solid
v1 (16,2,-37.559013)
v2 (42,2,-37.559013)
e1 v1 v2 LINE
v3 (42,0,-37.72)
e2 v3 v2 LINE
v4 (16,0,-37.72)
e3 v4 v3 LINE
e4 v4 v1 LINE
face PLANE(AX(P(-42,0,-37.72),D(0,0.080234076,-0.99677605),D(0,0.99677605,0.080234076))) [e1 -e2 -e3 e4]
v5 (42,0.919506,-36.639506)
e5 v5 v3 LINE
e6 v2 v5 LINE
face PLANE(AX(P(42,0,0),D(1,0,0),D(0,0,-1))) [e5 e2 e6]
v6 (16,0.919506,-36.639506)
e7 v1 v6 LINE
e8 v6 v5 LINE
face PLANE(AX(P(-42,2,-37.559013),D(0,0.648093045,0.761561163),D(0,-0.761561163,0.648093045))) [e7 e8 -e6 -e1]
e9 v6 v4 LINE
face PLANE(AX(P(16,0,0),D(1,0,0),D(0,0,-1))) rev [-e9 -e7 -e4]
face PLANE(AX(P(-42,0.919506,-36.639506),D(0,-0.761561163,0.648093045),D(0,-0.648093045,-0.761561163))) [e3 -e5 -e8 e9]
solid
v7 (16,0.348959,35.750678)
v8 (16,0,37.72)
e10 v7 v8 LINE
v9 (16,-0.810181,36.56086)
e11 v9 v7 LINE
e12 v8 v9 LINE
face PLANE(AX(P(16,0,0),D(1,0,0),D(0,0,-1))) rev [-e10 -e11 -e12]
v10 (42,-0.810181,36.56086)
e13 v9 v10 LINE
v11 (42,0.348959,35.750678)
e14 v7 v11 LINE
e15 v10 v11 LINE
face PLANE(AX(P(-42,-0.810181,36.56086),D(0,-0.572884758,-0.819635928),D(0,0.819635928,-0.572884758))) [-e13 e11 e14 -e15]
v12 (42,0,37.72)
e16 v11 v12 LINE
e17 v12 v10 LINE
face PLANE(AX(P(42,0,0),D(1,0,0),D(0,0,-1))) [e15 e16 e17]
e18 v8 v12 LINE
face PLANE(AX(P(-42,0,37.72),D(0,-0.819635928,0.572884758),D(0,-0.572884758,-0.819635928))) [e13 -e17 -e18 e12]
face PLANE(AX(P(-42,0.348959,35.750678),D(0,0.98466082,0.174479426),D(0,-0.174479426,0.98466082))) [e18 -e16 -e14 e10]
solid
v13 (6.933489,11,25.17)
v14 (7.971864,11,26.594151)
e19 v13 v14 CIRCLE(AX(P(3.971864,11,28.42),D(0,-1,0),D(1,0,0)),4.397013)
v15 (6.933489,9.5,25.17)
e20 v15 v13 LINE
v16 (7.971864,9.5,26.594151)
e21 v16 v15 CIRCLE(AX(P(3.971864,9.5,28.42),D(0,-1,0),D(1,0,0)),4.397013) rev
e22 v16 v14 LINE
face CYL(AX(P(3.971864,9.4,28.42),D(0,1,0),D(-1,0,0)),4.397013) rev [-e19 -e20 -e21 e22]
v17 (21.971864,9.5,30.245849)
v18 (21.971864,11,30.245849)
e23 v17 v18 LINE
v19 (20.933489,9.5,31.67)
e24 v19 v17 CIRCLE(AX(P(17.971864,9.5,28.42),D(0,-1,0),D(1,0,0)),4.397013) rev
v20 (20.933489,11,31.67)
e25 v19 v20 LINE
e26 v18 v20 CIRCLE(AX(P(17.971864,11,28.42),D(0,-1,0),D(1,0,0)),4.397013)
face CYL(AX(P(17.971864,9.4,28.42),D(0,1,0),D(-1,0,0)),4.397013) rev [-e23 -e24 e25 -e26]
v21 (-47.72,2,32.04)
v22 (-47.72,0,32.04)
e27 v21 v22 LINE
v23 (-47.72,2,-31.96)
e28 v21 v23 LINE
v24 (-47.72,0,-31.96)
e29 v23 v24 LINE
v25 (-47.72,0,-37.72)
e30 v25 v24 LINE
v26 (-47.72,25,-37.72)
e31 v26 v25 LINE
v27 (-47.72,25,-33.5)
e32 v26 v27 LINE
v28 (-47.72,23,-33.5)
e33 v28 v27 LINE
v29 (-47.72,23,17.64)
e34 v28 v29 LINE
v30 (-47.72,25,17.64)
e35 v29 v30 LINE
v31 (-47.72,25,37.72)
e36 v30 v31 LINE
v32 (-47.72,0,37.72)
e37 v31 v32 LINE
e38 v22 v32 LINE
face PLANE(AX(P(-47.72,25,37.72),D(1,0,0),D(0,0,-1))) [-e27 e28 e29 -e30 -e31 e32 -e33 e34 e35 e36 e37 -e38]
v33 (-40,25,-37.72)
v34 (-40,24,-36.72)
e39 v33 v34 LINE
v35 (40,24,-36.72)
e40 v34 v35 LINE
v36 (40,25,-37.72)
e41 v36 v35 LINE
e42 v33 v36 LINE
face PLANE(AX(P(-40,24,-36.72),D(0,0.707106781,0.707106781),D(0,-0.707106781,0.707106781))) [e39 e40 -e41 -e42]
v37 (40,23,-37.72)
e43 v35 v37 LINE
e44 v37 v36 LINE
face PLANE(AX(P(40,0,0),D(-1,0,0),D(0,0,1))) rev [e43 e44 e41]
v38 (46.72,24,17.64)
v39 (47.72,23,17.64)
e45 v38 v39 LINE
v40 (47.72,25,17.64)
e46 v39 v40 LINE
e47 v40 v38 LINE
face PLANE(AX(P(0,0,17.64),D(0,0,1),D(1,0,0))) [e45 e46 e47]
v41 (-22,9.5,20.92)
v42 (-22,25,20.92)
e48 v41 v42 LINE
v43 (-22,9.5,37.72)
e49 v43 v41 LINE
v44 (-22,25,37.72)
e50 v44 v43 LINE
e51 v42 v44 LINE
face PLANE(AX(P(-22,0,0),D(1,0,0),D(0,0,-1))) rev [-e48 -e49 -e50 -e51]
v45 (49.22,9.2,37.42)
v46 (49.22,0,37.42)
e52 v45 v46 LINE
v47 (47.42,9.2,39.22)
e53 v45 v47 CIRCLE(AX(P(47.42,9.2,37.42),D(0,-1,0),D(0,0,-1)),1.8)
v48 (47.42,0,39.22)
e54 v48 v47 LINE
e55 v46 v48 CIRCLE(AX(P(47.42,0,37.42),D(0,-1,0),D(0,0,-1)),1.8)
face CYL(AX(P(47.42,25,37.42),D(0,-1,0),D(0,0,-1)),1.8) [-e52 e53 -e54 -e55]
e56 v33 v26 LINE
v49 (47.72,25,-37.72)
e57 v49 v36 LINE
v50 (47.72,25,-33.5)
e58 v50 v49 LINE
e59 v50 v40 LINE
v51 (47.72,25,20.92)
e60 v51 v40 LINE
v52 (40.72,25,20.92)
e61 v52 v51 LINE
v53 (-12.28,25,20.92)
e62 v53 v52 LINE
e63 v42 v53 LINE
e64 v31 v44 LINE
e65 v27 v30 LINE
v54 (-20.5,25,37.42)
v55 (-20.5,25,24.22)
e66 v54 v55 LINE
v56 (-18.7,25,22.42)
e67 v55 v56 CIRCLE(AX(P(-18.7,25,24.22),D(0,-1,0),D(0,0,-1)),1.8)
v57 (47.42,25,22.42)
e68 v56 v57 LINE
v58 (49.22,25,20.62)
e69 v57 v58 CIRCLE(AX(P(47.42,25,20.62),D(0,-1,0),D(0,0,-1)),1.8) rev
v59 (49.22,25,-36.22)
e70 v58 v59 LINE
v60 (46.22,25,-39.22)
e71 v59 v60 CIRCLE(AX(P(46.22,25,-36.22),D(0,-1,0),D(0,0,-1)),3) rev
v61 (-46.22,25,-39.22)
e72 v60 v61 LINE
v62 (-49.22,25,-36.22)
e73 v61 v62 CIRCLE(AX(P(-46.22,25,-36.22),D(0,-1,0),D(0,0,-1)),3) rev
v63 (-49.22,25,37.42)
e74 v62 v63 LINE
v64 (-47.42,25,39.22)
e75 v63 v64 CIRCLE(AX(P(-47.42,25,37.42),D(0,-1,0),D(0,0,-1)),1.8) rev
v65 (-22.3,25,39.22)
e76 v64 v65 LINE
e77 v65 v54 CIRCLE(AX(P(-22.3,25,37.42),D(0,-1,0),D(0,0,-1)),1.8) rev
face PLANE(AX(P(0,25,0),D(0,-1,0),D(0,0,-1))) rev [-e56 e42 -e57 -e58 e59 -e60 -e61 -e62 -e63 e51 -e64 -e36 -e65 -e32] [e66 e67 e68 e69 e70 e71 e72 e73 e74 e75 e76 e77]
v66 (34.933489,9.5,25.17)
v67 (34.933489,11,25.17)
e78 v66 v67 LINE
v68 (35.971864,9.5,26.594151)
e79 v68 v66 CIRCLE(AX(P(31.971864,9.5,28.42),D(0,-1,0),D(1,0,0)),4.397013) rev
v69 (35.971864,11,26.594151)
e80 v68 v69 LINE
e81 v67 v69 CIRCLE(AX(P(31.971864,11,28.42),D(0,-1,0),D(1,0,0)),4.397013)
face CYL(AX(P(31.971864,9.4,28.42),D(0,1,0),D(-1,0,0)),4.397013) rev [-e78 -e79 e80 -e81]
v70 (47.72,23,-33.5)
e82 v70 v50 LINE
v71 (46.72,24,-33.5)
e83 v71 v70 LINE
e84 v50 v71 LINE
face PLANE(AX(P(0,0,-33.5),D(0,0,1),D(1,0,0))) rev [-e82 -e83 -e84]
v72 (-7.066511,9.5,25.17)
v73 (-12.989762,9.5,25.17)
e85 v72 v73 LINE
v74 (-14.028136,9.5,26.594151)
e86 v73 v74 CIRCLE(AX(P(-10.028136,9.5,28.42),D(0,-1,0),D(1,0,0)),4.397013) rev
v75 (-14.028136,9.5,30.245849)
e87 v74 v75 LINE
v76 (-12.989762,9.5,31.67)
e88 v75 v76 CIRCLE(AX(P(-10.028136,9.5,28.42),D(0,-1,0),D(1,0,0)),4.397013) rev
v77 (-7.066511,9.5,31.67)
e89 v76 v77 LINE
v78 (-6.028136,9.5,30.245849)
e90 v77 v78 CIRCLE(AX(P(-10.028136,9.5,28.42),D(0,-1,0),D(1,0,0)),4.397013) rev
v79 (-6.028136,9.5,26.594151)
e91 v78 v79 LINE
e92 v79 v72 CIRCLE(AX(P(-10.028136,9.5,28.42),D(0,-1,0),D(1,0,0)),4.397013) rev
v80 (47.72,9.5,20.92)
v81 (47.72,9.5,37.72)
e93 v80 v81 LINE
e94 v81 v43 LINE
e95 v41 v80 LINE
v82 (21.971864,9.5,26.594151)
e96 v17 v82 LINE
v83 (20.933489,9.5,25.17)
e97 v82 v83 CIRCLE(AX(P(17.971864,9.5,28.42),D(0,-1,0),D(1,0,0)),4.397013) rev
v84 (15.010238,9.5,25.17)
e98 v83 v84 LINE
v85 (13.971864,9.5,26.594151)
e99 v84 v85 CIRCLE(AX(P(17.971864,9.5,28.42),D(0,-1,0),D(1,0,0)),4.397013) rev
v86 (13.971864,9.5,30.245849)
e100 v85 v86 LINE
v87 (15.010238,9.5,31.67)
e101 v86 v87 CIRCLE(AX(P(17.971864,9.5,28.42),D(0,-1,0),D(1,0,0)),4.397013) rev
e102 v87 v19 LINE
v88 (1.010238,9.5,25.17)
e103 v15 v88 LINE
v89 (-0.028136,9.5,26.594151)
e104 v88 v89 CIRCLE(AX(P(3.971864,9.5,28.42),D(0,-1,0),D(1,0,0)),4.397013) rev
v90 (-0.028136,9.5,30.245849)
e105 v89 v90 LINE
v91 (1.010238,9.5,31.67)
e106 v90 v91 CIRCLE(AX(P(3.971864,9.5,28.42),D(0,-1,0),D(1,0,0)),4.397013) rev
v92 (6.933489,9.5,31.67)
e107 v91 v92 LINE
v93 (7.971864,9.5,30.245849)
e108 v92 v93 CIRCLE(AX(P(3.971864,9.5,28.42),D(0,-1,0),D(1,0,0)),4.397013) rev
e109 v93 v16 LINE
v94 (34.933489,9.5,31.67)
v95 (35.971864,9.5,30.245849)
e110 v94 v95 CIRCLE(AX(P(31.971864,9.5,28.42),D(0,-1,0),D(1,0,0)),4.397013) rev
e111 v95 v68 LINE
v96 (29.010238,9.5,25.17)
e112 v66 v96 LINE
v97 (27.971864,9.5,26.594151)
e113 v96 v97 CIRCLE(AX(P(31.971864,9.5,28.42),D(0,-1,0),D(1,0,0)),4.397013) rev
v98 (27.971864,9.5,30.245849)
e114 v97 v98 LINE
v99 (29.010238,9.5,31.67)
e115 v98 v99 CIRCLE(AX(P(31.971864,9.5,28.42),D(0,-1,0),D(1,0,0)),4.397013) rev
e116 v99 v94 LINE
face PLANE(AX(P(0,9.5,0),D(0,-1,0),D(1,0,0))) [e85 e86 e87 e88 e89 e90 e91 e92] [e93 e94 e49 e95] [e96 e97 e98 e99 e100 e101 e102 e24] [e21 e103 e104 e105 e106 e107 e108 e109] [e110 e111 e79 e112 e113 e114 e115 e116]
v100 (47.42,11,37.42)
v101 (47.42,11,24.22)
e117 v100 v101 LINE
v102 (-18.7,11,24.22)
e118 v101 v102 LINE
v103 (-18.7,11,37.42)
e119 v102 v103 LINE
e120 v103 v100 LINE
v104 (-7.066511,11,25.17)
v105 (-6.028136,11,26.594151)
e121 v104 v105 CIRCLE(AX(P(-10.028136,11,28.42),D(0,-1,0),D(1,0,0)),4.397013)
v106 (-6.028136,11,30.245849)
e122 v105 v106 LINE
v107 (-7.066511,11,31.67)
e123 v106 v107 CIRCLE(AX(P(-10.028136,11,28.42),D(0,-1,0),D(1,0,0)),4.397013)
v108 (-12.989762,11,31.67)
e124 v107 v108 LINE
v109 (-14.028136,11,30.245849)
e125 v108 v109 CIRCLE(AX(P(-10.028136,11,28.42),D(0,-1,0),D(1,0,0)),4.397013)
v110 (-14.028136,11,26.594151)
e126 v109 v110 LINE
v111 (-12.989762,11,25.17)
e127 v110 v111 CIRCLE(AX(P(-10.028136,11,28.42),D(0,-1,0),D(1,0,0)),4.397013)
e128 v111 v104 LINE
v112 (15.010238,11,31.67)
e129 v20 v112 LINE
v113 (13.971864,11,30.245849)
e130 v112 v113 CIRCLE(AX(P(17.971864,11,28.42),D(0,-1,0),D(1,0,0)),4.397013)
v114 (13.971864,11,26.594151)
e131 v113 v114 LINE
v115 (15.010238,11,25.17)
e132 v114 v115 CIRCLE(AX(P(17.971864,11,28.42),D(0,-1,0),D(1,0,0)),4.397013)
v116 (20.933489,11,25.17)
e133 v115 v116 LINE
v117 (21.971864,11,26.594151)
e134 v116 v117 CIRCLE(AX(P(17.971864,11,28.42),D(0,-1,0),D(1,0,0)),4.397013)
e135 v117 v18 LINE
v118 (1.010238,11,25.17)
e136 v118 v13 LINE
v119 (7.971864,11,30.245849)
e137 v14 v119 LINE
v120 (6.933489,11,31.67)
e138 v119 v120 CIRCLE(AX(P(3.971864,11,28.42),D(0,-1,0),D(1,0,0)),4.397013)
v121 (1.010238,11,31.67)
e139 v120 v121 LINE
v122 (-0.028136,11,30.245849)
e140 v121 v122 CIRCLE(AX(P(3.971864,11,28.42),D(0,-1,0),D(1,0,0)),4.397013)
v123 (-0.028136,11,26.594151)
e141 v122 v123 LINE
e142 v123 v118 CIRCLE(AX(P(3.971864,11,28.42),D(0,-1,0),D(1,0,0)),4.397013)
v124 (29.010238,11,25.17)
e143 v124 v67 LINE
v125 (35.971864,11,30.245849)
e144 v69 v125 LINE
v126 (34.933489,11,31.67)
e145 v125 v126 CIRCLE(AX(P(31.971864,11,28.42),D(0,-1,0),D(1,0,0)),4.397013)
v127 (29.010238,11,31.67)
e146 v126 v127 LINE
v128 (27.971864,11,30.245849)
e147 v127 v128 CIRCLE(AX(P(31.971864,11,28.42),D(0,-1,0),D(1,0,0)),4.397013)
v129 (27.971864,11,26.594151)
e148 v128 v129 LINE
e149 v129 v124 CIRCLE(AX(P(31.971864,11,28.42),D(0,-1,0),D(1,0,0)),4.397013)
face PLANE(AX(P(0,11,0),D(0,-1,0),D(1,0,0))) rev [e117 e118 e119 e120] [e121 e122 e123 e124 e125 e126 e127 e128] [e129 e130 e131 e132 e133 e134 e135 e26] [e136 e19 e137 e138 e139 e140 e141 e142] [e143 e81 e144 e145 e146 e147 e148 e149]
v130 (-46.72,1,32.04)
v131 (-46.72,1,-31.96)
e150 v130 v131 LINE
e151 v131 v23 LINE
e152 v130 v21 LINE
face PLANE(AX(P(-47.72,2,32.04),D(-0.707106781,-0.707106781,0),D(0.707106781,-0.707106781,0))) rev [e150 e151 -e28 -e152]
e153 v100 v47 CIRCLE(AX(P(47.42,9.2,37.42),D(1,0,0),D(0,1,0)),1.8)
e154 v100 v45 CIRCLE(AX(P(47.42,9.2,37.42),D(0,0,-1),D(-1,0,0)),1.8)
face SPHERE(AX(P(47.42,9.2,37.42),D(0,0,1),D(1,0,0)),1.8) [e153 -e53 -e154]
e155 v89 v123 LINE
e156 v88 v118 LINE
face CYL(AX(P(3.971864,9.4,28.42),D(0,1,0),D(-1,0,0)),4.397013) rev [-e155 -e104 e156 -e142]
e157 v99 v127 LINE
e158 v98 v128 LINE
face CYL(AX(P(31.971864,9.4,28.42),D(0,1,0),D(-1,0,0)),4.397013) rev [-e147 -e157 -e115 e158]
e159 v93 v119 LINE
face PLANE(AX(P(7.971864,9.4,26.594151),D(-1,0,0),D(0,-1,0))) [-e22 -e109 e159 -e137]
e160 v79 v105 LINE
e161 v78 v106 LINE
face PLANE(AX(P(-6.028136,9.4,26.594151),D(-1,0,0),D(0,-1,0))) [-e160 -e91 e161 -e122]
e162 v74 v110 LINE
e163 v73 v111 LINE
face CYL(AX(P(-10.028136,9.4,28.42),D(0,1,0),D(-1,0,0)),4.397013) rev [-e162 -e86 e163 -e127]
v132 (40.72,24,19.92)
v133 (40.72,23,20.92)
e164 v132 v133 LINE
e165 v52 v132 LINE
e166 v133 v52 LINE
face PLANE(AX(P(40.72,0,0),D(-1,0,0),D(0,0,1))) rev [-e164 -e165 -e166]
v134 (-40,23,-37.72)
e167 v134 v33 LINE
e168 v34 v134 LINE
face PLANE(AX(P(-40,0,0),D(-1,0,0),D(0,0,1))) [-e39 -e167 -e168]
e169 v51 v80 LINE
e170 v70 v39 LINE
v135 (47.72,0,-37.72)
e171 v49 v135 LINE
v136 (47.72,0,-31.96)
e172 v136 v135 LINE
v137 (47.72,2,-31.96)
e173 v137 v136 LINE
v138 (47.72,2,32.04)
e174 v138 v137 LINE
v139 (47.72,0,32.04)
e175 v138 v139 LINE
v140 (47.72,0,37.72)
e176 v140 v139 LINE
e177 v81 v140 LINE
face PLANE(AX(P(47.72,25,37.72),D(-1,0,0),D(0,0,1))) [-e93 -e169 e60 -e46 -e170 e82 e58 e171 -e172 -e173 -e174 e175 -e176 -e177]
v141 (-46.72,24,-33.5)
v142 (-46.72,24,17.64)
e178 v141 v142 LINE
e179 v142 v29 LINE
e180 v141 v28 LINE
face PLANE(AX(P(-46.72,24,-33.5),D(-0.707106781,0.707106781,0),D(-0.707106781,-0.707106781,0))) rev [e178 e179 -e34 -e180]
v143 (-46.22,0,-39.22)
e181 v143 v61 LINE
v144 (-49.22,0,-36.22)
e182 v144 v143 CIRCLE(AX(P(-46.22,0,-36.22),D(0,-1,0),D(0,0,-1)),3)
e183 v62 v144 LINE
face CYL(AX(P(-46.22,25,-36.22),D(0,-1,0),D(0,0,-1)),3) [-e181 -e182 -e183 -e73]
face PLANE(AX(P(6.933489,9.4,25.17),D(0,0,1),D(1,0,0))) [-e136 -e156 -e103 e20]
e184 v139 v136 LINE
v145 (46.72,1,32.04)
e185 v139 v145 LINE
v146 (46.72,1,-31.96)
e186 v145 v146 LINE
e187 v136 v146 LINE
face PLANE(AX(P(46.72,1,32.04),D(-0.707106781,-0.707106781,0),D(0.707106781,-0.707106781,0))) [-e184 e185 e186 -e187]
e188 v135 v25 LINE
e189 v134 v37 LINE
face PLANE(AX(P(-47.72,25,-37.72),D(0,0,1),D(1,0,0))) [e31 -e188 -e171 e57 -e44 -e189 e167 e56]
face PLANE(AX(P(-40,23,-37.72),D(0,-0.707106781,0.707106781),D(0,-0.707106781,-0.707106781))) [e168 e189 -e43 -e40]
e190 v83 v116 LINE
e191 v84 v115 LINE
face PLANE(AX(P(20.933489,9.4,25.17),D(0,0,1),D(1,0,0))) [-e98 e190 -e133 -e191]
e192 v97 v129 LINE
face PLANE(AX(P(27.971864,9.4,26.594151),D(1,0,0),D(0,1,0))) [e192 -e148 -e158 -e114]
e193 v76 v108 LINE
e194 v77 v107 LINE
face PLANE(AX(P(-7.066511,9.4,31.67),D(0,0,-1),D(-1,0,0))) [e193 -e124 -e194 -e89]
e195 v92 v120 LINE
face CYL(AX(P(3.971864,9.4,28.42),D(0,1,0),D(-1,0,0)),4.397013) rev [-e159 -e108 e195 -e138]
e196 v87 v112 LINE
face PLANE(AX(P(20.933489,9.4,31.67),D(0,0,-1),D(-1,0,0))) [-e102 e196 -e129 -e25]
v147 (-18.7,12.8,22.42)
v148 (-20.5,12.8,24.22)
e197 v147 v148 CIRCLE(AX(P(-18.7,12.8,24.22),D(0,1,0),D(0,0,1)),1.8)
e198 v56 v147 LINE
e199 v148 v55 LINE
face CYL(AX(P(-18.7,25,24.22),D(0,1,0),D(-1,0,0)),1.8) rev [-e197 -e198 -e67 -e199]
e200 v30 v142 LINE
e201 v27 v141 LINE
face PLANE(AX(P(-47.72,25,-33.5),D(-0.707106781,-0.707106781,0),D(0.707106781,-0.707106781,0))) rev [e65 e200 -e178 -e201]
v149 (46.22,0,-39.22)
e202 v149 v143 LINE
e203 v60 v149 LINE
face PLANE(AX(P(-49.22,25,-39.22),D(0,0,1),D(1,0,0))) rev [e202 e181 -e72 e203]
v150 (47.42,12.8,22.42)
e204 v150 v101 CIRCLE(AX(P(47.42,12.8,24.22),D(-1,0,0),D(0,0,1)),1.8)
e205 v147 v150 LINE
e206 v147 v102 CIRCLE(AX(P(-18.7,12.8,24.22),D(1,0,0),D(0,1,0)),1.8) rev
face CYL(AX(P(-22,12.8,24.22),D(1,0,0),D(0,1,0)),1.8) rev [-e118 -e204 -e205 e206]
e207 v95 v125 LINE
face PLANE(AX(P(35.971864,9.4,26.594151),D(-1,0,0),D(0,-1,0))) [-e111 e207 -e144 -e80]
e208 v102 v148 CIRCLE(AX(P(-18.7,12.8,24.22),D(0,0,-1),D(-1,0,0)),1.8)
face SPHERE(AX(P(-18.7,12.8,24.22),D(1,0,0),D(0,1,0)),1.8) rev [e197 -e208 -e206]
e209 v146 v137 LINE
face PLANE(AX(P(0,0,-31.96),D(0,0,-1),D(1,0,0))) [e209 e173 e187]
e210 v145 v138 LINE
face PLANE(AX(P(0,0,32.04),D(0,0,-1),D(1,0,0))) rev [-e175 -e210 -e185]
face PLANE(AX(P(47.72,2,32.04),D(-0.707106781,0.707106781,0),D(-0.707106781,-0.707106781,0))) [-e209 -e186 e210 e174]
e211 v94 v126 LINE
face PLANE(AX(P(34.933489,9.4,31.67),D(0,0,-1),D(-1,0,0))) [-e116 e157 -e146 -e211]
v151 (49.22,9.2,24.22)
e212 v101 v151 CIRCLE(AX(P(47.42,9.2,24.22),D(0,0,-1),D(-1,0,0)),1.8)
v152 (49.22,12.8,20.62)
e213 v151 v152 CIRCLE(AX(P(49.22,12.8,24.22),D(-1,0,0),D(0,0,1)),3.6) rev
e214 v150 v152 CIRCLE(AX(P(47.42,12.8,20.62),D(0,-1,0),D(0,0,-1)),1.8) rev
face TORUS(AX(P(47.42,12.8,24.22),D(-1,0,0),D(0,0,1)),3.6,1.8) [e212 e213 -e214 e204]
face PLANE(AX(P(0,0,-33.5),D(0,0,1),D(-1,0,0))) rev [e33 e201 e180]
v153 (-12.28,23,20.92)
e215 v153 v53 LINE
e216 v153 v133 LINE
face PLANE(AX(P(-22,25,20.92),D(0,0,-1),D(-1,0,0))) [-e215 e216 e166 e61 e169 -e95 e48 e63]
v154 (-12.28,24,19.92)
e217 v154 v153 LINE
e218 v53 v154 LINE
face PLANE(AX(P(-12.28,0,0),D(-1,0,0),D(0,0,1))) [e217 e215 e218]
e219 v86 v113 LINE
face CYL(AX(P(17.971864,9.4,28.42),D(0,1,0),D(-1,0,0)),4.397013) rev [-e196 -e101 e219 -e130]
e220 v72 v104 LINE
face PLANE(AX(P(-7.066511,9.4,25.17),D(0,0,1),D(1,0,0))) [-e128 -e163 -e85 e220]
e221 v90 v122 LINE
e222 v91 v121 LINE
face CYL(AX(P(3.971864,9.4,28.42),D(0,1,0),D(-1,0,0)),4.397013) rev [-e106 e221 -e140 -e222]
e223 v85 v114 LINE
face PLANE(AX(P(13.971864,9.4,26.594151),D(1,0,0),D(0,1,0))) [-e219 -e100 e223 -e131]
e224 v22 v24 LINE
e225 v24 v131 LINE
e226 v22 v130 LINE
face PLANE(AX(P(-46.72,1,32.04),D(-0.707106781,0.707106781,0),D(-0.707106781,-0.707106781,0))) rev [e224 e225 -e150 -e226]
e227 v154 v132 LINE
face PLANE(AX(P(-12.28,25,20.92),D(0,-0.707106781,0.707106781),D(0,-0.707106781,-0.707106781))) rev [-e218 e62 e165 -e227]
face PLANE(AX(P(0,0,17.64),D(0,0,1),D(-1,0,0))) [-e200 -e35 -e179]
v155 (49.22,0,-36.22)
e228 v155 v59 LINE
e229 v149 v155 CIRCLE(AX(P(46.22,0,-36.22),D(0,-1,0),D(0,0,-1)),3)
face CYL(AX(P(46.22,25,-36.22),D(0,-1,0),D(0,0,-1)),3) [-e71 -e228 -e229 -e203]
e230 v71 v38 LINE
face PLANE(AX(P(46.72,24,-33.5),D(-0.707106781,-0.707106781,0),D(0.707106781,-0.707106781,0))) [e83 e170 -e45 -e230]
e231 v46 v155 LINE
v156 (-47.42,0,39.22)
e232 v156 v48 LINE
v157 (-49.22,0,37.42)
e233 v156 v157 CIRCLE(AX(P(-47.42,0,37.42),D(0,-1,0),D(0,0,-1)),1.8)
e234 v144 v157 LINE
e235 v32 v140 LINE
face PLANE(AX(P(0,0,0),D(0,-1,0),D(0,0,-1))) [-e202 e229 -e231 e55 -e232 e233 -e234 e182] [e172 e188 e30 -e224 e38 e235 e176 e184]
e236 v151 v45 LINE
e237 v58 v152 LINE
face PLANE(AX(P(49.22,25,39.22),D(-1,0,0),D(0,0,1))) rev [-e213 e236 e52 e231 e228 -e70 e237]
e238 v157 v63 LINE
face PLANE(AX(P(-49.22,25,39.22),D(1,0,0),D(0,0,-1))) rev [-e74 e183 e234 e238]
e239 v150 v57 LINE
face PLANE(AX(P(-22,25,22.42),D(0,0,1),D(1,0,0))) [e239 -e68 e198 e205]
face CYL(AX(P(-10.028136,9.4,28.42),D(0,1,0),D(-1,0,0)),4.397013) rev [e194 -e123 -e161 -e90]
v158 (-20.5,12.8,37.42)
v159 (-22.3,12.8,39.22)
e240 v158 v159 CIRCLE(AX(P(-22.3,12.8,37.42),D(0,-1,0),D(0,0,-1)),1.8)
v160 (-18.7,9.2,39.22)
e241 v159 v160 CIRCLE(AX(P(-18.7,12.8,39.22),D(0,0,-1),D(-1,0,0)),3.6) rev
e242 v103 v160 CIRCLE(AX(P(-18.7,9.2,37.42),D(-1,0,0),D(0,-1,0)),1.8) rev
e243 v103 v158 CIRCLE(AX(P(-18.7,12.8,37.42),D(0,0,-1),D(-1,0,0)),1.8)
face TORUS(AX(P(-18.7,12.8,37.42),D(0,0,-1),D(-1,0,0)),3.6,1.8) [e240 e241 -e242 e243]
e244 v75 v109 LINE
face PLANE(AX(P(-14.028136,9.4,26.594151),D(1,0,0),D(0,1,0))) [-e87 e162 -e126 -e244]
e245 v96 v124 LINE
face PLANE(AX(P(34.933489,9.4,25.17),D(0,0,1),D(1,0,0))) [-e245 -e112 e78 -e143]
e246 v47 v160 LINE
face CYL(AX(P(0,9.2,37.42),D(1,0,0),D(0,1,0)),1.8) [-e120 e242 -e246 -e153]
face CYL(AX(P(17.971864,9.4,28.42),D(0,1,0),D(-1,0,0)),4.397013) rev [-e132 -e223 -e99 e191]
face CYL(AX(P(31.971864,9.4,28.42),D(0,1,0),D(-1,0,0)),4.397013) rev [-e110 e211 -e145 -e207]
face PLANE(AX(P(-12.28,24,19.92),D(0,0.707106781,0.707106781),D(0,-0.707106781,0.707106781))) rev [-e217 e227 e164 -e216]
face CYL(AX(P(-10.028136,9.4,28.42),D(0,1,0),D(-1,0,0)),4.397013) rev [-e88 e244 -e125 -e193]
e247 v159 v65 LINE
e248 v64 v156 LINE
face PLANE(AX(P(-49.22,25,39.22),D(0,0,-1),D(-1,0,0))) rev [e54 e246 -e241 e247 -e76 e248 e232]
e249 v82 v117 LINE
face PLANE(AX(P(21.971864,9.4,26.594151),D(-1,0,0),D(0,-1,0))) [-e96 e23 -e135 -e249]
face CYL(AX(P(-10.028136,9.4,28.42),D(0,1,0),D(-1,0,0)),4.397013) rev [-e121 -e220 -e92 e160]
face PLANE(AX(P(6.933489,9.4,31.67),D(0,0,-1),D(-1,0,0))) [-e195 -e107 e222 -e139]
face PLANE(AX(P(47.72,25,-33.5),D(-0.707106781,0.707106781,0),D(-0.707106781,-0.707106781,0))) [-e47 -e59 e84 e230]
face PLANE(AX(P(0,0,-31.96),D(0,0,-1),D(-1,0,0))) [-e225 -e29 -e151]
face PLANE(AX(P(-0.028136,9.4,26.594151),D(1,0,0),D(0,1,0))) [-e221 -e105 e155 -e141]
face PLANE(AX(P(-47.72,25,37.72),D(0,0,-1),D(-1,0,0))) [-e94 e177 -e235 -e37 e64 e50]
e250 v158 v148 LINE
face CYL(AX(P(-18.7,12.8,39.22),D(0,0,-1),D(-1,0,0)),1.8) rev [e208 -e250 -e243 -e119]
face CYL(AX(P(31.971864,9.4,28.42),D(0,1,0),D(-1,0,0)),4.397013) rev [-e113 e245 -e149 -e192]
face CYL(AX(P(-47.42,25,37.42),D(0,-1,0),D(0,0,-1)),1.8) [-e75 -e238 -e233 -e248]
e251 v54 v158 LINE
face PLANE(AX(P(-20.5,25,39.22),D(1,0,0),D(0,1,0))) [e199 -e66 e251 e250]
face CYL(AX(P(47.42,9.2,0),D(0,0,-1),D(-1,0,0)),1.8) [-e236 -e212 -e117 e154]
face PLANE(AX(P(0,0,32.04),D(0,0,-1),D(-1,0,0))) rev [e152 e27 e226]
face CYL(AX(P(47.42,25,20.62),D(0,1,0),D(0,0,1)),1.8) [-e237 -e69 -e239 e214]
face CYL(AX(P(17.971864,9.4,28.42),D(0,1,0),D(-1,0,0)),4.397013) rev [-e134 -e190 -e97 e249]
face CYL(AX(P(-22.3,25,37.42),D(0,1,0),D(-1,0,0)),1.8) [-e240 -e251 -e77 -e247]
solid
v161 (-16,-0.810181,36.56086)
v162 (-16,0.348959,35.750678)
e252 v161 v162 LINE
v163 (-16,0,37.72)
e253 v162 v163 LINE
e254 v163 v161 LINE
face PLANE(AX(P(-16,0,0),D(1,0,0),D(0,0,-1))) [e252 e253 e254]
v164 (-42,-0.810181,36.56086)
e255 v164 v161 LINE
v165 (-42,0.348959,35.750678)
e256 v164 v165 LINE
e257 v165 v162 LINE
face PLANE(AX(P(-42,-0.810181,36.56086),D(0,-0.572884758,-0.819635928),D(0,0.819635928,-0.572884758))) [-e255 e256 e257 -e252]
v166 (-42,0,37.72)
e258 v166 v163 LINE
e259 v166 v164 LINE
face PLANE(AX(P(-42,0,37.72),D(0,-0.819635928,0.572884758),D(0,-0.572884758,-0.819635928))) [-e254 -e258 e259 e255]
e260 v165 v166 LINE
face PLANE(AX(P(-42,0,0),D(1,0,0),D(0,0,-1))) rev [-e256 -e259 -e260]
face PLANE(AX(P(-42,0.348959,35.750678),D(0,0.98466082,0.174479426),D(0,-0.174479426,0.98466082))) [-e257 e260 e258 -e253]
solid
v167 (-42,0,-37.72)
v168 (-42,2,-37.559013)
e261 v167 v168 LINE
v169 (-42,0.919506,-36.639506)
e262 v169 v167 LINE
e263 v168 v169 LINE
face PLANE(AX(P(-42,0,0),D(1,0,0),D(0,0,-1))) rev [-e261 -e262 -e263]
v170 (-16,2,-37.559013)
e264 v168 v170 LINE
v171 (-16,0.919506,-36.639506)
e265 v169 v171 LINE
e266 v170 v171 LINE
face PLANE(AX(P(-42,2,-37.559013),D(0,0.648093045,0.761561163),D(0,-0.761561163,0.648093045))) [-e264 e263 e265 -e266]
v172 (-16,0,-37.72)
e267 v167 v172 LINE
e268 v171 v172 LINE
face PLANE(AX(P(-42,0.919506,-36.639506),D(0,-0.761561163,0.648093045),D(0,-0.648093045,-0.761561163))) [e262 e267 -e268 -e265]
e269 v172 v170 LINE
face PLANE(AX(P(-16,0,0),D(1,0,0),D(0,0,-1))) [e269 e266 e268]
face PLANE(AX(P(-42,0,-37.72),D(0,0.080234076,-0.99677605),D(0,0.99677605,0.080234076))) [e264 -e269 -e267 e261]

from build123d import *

# Parameters (mm, degrees)
SKETCH1_W                 = 98.44
SKETCH1_H                 = 78.44
SKETCH1_W_2               = 95.44
SKETCH1_H_2               = 75.44
BOSS_EXTRUDE1_DEPTH       = 25
SKETCH4_W                 = 98.44
SKETCH4_H                 = 16.8
BOSS_EXTRUDE2_DEPTH       = 1.5
CUT_EXTRUDE1_DEPTH        = 1.6
SKETCH5_W                 = 18
SKETCH5_H                 = 14
CUT_EXTRUDE2_DEPTH        = 70.5
BOSS_EXTRUDE9_DEPTH       = 49.22
BOSS_EXTRUDE9_DEPTH_BACK  = 22
SKETCH7_W                 = 1.5
SKETCH7_H                 = 15.5
BOSS_EXTRUDE10_START      = -56
BOSS_EXTRUDE10_DEPTH      = 64
BOSS_EXTRUDE11_DEPTH      = 42
BOSS_EXTRUDE11_DEPTH_BACK = 42
CUT_EXTRUDE3_DEPTH        = 16
CUT_EXTRUDE3_DEPTH_BACK   = 16
BOSS_EXTRUDE12_DEPTH      = 42
BOSS_EXTRUDE12_DEPTH_BACK = 42
CUT_EXTRUDE4_DEPTH        = 16
CUT_EXTRUDE4_DEPTH_BACK   = 16
BOSS_EXTRUDE13_DEPTH      = 40
BOSS_EXTRUDE13_DEPTH_BACK = 40
BOSS_EXTRUDE14_START      = -15.64
BOSS_EXTRUDE14_DEPTH      = 51.14
FILLET4_R                 = 1.8
SKETCH16_W                = 1.5
SKETCH16_H                = 14
BOSS_EXTRUDE15_DEPTH      = 16.8
SKETCH17_W                = 15.3
SKETCH17_H                = 1.5
CUT_EXTRUDE6_DEPTH        = 25.72
FILLET5_R                 = 1.8
BOSS_EXTRUDE16_DEPTH      = 53
FILLET6_R                 = 3


with BuildPart() as part:
    # Sketch1 → Boss-Extrude1 (new body)
    with BuildSketch(Plane(origin=(0, 0, 0), x_dir=(1, 0, 0), z_dir=(0, 1, 0))):
        Rectangle(SKETCH1_W, SKETCH1_H)
        Rectangle(SKETCH1_W_2, SKETCH1_H_2, mode=Mode.SUBTRACT)
    extrude(amount=BOSS_EXTRUDE1_DEPTH)

    # Sketch4 → Boss-Extrude2 (add)
    with BuildSketch(Plane(origin=(0, 11, 0), x_dir=(-1, 0, 0), z_dir=(0, -1, 0))):
        with Locations((0, -30.82)):
            Rectangle(SKETCH4_W, SKETCH4_H)
    extrude(amount=BOSS_EXTRUDE2_DEPTH)

    # Sketch3 → Cut-Extrude1 (cut)
    with BuildSketch(Plane(origin=(0, 11, 0), x_dir=(-1, 0, 0), z_dir=(0, -1, 0))):
        with BuildLine():
            Line((-34.933489157, -25.17), (-29.010238143, -25.17))
            ThreePointArc((-29.010238143, -25.17), (-28.418962197, -25.829514156), (-27.97186365, -26.594150707))
            Line((-27.97186365, -26.594150707), (-27.97186365, -30.245849293))
            ThreePointArc((-27.97186365, -30.245849293), (-28.418962197, -31.010485844), (-29.010238143, -31.67))
            Line((-29.010238143, -31.67), (-34.933489157, -31.67))
            ThreePointArc((-34.933489157, -31.67), (-35.524765103, -31.010485844), (-35.97186365, -30.245849293))
            Line((-35.97186365, -30.245849293), (-35.97186365, -26.594150707))
            ThreePointArc((-35.97186365, -26.594150707), (-35.524765103, -25.829514156), (-34.933489157, -25.17))
        make_face()
        with BuildLine():
            Line((-20.933489157, -25.17), (-15.010238143, -25.17))
            ThreePointArc((-15.010238143, -25.17), (-14.418962197, -25.829514156), (-13.97186365, -26.594150707))
            Line((-13.97186365, -26.594150707), (-13.97186365, -30.245849293))
            ThreePointArc((-13.97186365, -30.245849293), (-14.418962197, -31.010485844), (-15.010238143, -31.67))
            Line((-15.010238143, -31.67), (-20.933489157, -31.67))
            ThreePointArc((-20.933489157, -31.67), (-21.524765103, -31.010485844), (-21.97186365, -30.245849293))
            Line((-21.97186365, -30.245849293), (-21.97186365, -26.594150707))
            ThreePointArc((-21.97186365, -26.594150707), (-21.524765103, -25.829514156), (-20.933489157, -25.17))
        make_face()
        with BuildLine():
            Line((-6.933489157, -25.17), (-1.010238143, -25.17))
            ThreePointArc((-1.010238143, -25.17), (-0.418962197, -25.829514156), (0.02813635, -26.594150707))
            Line((0.02813635, -26.594150707), (0.02813635, -30.245849293))
            ThreePointArc((0.02813635, -30.245849293), (-0.418962197, -31.010485844), (-1.010238143, -31.67))
            Line((-1.010238143, -31.67), (-6.933489157, -31.67))
            ThreePointArc((-6.933489157, -31.67), (-7.524765103, -31.010485844), (-7.97186365, -30.245849293))
            Line((-7.97186365, -30.245849293), (-7.97186365, -26.594150707))
            ThreePointArc((-7.97186365, -26.594150707), (-7.524765103, -25.829514156), (-6.933489157, -25.17))
        make_face()
        with BuildLine():
            Line((7.066510843, -25.17), (12.989761857, -25.17))
            ThreePointArc((12.989761857, -25.17), (13.581037803, -25.829514156), (14.02813635, -26.594150707))
            Line((14.02813635, -26.594150707), (14.02813635, -30.245849293))
            ThreePointArc((14.02813635, -30.245849293), (13.581037803, -31.010485844), (12.989761857, -31.67))
            Line((12.989761857, -31.67), (7.066510843, -31.67))
            ThreePointArc((7.066510843, -31.67), (6.475234897, -31.010485844), (6.02813635, -30.245849293))
            Line((6.02813635, -30.245849293), (6.02813635, -26.594150707))
            ThreePointArc((6.02813635, -26.594150707), (6.475234897, -25.829514156), (7.066510843, -25.17))
        make_face()
    extrude(amount=CUT_EXTRUDE1_DEPTH, mode=Mode.SUBTRACT)

    # Sketch5 → Cut-Extrude2 (cut)
    with BuildSketch(Plane(origin=(49.22, 0, 0), x_dir=(0, 0, -1), z_dir=(1, 0, 0))):
        with Locations((-30.22, 18)):
            Rectangle(SKETCH5_W, SKETCH5_H)
    extrude(amount=-CUT_EXTRUDE2_DEPTH, mode=Mode.SUBTRACT)

    # Sketch7 → Boss-Extrude9 (add, two sides: drawn at the far end of the back side and taken through both)
    with BuildSketch(Plane(origin=(0, 0, 0), x_dir=(0, 0, -1), z_dir=(1, 0, 0)).offset(-BOSS_EXTRUDE9_DEPTH_BACK)):
        with Locations((-21.67, 17.25)):
            Rectangle(SKETCH7_W, SKETCH7_H)
    extrude(amount=BOSS_EXTRUDE9_DEPTH + BOSS_EXTRUDE9_DEPTH_BACK)

    # Sketch9 → Boss-Extrude10 (add)
    with BuildSketch(Plane.XY.offset(24.04).offset(BOSS_EXTRUDE10_START)):
        Polygon((-47.72, 2), (-46.72, 1), (-47.72, 0), align=None)
    boss_extrude10 = extrude(amount=BOSS_EXTRUDE10_DEPTH)

    # Mirror1: Boss-Extrude10 across plane
    add(boss_extrude10.mirror(Plane(origin=(0, 0, 0), x_dir=(0, 0, 1), z_dir=(1, 0, 0))))

    # Sketch12 → Boss-Extrude13 (add, two sides: drawn at the far end of the back side and taken through both)
    with BuildSketch(Plane(origin=(0, 0, 0), x_dir=(0, 0, -1), z_dir=(1, 0, 0)).offset(-BOSS_EXTRUDE13_DEPTH_BACK)):
        Polygon((36.72, 24), (37.72, 25), (37.72, 23), align=None)
    extrude(amount=BOSS_EXTRUDE13_DEPTH + BOSS_EXTRUDE13_DEPTH_BACK)

    # Sketch14 → Boss-Extrude14 (add)
    with BuildSketch(Plane.XY.offset(-17.86).offset(BOSS_EXTRUDE14_START)):
        Polygon((47.72, 25), (46.72, 24), (47.72, 23), align=None)
    boss_extrude14 = extrude(amount=BOSS_EXTRUDE14_DEPTH)

    # Mirror3: Boss-Extrude14 across plane
    add(boss_extrude14.mirror(Plane(origin=(0, 0, 0), x_dir=(0, 0, 1), z_dir=(1, 0, 0))))

    # Fillet4
    fillet4_edges = [part.edges().sort_by_distance(p)[0] for p in [
        (49.22, 5.5, 39.22),
        (49.22, 11, 30.82),
        (13.61, 11, 22.42),
        (49.22, 18, 22.42),
        (-49.22, 12.5, 39.22),
    ]]
    fillet(fillet4_edges, radius=FILLET4_R)

    # Sketch16 → Boss-Extrude15 (add)
    with BuildSketch(Plane.XY.offset(22.42)):
        with Locations((-21.25, 18)):
            Rectangle(SKETCH16_W, SKETCH16_H)
    extrude(amount=BOSS_EXTRUDE15_DEPTH)

    # Sketch17 → Cut-Extrude6 (cut)
    with BuildSketch(Plane(origin=(-47.72, 0, 0), x_dir=(0, 0, -1), z_dir=(1, 0, 0))):
        with Locations((-30.07, 10.25)):
            Rectangle(SKETCH17_W, SKETCH17_H)
    extrude(amount=CUT_EXTRUDE6_DEPTH, mode=Mode.SUBTRACT)

    # Fillet5
    # the kernel refuses this fillet: 1.8 mm, written as the material it adds along each edge
    with BuildSketch(Plane(origin=(-20.5, 12.8, 24.22), x_dir=(0, 0, -1), z_dir=(0, 1, 0))) as fillet5_piece_1:
        with BuildLine():
            CenterArc((1.8 - FILLET5_R, -FILLET5_R), FILLET5_R, 0, 90)
            Line((1.8 - FILLET5_R, 0), (1.8, 0))
            Line((1.8, 0), (1.8, -FILLET5_R))
        make_face()
    revolve(axis=Axis((-20.5, 12.8, 24.22), (-1, 0, 0)), revolution_arc=90)
    with BuildSketch(Plane(origin=(-20.5, 11, 24.22), x_dir=(1, 0, 0), z_dir=(0, 0, 1))) as fillet5_piece_2:
        with BuildLine():
            CenterArc((FILLET5_R, FILLET5_R), FILLET5_R, 180, 90)
            Line((0, FILLET5_R), (0, 0))
            Line((0, 0), (FILLET5_R, 0))
        make_face()
    extrude(amount=15)
    with BuildSketch(Plane(origin=(-20.5, 25, 22.42), x_dir=(1, 0, 0), z_dir=(0, -1, 0))) as fillet5_piece_3:
        with BuildLine():
            CenterArc((FILLET5_R, FILLET5_R), FILLET5_R, 180, 90)
            Line((0, FILLET5_R), (0, 0))
            Line((0, 0), (FILLET5_R, 0))
        make_face()
    extrude(amount=12.2)
    # the kernel refuses this fillet: 1.8 mm, written as the material it takes off along each edge
    with BuildSketch(Plane(origin=(47.42, 9.2, 37.42), x_dir=(0, 1, 0), z_dir=(0, 0, 1))) as fillet5_2_piece_1_section:
        Polygon((0, 0), (FILLET5_R, 0), (FILLET5_R, -FILLET5_R), (0, -FILLET5_R), align=None)
    fillet5_2_piece_1 = extrude(amount=FILLET5_R, mode=Mode.PRIVATE)
    fillet5_2_piece_1 = fillet5_2_piece_1 - Plane(origin=(47.42, 9.2, 37.42), x_dir=(-0.7071067811865475, -0.7071067811865475, 0), z_dir=(0, 0, 1)) * Sphere(FILLET5_R, mode=Mode.PRIVATE)
    add(fillet5_2_piece_1, mode=Mode.SUBTRACT)
    with BuildSketch(Plane(origin=(47.42, 11, 39.22), x_dir=(0, -1, 0), z_dir=(-1, 0, 0))) as fillet5_2_piece_2:
        with BuildLine():
            CenterArc((FILLET5_R, -FILLET5_R), FILLET5_R, 90, 90)
            Line((0, -FILLET5_R), (0, 0))
            Line((0, 0), (FILLET5_R, 0))
        make_face()
    extrude(amount=66.12, mode=Mode.SUBTRACT)
    with BuildSketch(Plane(origin=(-20.5, 29.5, 39.22), x_dir=(-1, 0, 0), z_dir=(0, -1, 0))) as fillet5_2_piece_3:
        with BuildLine():
            CenterArc((FILLET5_R, FILLET5_R), FILLET5_R, 180, 90)
            Line((0, FILLET5_R), (0, 0))
            Line((0, 0), (FILLET5_R, 0))
        make_face()
    extrude(amount=16.7, mode=Mode.SUBTRACT)
    with BuildSketch(Plane(origin=(-18.7, 12.8, 39.22), x_dir=(0, -1, 0), z_dir=(1, 0, 0))) as fillet5_2_piece_4:
        with BuildLine():
            CenterArc((1.8 + FILLET5_R, FILLET5_R), FILLET5_R, 180, 90)
            Line((1.8, FILLET5_R), (1.8, 0))
            Line((1.8, 0), (1.8 + FILLET5_R, 0))
        make_face()
    revolve(axis=Axis((-18.7, 12.8, 39.22), (0, 0, -1)), revolution_arc=90, mode=Mode.SUBTRACT)

    # Sketch19 → Boss-Extrude16 (add)
    with BuildSketch(Plane.ZY.offset(-40.72)):
        Polygon((20.92, 25), (19.92, 24), (20.92, 23), align=None)
    extrude(amount=BOSS_EXTRUDE16_DEPTH)

    # Fillet6
    fillet6_edges = [part.edges().sort_by_distance(p)[0] for p in [
        (-49.22, 12.5, -39.22),
        (49.22, 12.5, -39.22),
    ]]
    fillet(fillet6_edges, radius=FILLET6_R)


with BuildPart() as body_2:
    # Sketch10 → Boss-Extrude11 (new, two sides: drawn at the far end of the back side and taken through both)
    with BuildSketch(Plane(origin=(0, 0, 0), x_dir=(0, 0, -1), z_dir=(1, 0, 0)).offset(-BOSS_EXTRUDE11_DEPTH_BACK)):
        Polygon((-37.72, 0), (-36.560859755, -0.810181394), (-35.75067836, 0.348958851), align=None)
    extrude(amount=BOSS_EXTRUDE11_DEPTH + BOSS_EXTRUDE11_DEPTH_BACK)

    # Sketch10<2> → Cut-Extrude3 (cut, two sides: drawn at the far end of the back side and taken through both)
    with BuildSketch(Plane(origin=(0, 0, 0), x_dir=(0, 0, -1), z_dir=(1, 0, 0)).offset(-CUT_EXTRUDE3_DEPTH_BACK)):
        Polygon((-37.72, 0), (-36.560859755, -0.810181394), (-35.75067836, 0.348958851), align=None)
    extrude(amount=CUT_EXTRUDE3_DEPTH + CUT_EXTRUDE3_DEPTH_BACK, mode=Mode.SUBTRACT)


with BuildPart() as cut_extrude3_piece_1:
    # of the separate pieces the step leaves, piece 1, a body of its own (cut_extrude3_pieces)
    add(body_2.part.solids().sort_by_distance((-16, 0, 37.72))[0])


with BuildPart() as cut_extrude3_piece_2:
    # of the separate pieces the step leaves, piece 2, a body of its own (cut_extrude3_pieces)
    add(body_2.part.solids().sort_by_distance((42, 0, 37.72))[0])


with BuildPart() as body_4:
    # Sketch11 → Boss-Extrude12 (new, two sides: drawn at the far end of the back side and taken through both)
    with BuildSketch(Plane(origin=(0, 0, 0), x_dir=(0, 0, -1), z_dir=(1, 0, 0)).offset(-BOSS_EXTRUDE12_DEPTH_BACK)):
        Polygon((37.559012834, 2), (36.639506417, 0.919506417), (37.72, 0), align=None)
    extrude(amount=BOSS_EXTRUDE12_DEPTH + BOSS_EXTRUDE12_DEPTH_BACK)

    # Sketch11<2> → Cut-Extrude4 (cut, two sides: drawn at the far end of the back side and taken through both)
    with BuildSketch(Plane(origin=(0, 0, 0), x_dir=(0, 0, -1), z_dir=(1, 0, 0)).offset(-CUT_EXTRUDE4_DEPTH_BACK)):
        Polygon((37.559012834, 2), (36.639506417, 0.919506417), (37.72, 0), align=None)
    extrude(amount=CUT_EXTRUDE4_DEPTH + CUT_EXTRUDE4_DEPTH_BACK, mode=Mode.SUBTRACT)


with BuildPart() as cut_extrude4_piece_1:
    # of the separate pieces the step leaves, piece 1, a body of its own (cut_extrude4_pieces)
    add(body_4.part.solids().sort_by_distance((42, 2, -37.559012834))[0])


with BuildPart() as cut_extrude4_piece_2:
    # of the separate pieces the step leaves, piece 2, a body of its own (cut_extrude4_pieces)
    add(body_4.part.solids().sort_by_distance((-16, 2, -37.559012834))[0])


solid = Compound([part.part, cut_extrude3_piece_1.part, cut_extrude3_piece_2.part, cut_extrude4_piece_1.part, cut_extrude4_piece_2.part])
